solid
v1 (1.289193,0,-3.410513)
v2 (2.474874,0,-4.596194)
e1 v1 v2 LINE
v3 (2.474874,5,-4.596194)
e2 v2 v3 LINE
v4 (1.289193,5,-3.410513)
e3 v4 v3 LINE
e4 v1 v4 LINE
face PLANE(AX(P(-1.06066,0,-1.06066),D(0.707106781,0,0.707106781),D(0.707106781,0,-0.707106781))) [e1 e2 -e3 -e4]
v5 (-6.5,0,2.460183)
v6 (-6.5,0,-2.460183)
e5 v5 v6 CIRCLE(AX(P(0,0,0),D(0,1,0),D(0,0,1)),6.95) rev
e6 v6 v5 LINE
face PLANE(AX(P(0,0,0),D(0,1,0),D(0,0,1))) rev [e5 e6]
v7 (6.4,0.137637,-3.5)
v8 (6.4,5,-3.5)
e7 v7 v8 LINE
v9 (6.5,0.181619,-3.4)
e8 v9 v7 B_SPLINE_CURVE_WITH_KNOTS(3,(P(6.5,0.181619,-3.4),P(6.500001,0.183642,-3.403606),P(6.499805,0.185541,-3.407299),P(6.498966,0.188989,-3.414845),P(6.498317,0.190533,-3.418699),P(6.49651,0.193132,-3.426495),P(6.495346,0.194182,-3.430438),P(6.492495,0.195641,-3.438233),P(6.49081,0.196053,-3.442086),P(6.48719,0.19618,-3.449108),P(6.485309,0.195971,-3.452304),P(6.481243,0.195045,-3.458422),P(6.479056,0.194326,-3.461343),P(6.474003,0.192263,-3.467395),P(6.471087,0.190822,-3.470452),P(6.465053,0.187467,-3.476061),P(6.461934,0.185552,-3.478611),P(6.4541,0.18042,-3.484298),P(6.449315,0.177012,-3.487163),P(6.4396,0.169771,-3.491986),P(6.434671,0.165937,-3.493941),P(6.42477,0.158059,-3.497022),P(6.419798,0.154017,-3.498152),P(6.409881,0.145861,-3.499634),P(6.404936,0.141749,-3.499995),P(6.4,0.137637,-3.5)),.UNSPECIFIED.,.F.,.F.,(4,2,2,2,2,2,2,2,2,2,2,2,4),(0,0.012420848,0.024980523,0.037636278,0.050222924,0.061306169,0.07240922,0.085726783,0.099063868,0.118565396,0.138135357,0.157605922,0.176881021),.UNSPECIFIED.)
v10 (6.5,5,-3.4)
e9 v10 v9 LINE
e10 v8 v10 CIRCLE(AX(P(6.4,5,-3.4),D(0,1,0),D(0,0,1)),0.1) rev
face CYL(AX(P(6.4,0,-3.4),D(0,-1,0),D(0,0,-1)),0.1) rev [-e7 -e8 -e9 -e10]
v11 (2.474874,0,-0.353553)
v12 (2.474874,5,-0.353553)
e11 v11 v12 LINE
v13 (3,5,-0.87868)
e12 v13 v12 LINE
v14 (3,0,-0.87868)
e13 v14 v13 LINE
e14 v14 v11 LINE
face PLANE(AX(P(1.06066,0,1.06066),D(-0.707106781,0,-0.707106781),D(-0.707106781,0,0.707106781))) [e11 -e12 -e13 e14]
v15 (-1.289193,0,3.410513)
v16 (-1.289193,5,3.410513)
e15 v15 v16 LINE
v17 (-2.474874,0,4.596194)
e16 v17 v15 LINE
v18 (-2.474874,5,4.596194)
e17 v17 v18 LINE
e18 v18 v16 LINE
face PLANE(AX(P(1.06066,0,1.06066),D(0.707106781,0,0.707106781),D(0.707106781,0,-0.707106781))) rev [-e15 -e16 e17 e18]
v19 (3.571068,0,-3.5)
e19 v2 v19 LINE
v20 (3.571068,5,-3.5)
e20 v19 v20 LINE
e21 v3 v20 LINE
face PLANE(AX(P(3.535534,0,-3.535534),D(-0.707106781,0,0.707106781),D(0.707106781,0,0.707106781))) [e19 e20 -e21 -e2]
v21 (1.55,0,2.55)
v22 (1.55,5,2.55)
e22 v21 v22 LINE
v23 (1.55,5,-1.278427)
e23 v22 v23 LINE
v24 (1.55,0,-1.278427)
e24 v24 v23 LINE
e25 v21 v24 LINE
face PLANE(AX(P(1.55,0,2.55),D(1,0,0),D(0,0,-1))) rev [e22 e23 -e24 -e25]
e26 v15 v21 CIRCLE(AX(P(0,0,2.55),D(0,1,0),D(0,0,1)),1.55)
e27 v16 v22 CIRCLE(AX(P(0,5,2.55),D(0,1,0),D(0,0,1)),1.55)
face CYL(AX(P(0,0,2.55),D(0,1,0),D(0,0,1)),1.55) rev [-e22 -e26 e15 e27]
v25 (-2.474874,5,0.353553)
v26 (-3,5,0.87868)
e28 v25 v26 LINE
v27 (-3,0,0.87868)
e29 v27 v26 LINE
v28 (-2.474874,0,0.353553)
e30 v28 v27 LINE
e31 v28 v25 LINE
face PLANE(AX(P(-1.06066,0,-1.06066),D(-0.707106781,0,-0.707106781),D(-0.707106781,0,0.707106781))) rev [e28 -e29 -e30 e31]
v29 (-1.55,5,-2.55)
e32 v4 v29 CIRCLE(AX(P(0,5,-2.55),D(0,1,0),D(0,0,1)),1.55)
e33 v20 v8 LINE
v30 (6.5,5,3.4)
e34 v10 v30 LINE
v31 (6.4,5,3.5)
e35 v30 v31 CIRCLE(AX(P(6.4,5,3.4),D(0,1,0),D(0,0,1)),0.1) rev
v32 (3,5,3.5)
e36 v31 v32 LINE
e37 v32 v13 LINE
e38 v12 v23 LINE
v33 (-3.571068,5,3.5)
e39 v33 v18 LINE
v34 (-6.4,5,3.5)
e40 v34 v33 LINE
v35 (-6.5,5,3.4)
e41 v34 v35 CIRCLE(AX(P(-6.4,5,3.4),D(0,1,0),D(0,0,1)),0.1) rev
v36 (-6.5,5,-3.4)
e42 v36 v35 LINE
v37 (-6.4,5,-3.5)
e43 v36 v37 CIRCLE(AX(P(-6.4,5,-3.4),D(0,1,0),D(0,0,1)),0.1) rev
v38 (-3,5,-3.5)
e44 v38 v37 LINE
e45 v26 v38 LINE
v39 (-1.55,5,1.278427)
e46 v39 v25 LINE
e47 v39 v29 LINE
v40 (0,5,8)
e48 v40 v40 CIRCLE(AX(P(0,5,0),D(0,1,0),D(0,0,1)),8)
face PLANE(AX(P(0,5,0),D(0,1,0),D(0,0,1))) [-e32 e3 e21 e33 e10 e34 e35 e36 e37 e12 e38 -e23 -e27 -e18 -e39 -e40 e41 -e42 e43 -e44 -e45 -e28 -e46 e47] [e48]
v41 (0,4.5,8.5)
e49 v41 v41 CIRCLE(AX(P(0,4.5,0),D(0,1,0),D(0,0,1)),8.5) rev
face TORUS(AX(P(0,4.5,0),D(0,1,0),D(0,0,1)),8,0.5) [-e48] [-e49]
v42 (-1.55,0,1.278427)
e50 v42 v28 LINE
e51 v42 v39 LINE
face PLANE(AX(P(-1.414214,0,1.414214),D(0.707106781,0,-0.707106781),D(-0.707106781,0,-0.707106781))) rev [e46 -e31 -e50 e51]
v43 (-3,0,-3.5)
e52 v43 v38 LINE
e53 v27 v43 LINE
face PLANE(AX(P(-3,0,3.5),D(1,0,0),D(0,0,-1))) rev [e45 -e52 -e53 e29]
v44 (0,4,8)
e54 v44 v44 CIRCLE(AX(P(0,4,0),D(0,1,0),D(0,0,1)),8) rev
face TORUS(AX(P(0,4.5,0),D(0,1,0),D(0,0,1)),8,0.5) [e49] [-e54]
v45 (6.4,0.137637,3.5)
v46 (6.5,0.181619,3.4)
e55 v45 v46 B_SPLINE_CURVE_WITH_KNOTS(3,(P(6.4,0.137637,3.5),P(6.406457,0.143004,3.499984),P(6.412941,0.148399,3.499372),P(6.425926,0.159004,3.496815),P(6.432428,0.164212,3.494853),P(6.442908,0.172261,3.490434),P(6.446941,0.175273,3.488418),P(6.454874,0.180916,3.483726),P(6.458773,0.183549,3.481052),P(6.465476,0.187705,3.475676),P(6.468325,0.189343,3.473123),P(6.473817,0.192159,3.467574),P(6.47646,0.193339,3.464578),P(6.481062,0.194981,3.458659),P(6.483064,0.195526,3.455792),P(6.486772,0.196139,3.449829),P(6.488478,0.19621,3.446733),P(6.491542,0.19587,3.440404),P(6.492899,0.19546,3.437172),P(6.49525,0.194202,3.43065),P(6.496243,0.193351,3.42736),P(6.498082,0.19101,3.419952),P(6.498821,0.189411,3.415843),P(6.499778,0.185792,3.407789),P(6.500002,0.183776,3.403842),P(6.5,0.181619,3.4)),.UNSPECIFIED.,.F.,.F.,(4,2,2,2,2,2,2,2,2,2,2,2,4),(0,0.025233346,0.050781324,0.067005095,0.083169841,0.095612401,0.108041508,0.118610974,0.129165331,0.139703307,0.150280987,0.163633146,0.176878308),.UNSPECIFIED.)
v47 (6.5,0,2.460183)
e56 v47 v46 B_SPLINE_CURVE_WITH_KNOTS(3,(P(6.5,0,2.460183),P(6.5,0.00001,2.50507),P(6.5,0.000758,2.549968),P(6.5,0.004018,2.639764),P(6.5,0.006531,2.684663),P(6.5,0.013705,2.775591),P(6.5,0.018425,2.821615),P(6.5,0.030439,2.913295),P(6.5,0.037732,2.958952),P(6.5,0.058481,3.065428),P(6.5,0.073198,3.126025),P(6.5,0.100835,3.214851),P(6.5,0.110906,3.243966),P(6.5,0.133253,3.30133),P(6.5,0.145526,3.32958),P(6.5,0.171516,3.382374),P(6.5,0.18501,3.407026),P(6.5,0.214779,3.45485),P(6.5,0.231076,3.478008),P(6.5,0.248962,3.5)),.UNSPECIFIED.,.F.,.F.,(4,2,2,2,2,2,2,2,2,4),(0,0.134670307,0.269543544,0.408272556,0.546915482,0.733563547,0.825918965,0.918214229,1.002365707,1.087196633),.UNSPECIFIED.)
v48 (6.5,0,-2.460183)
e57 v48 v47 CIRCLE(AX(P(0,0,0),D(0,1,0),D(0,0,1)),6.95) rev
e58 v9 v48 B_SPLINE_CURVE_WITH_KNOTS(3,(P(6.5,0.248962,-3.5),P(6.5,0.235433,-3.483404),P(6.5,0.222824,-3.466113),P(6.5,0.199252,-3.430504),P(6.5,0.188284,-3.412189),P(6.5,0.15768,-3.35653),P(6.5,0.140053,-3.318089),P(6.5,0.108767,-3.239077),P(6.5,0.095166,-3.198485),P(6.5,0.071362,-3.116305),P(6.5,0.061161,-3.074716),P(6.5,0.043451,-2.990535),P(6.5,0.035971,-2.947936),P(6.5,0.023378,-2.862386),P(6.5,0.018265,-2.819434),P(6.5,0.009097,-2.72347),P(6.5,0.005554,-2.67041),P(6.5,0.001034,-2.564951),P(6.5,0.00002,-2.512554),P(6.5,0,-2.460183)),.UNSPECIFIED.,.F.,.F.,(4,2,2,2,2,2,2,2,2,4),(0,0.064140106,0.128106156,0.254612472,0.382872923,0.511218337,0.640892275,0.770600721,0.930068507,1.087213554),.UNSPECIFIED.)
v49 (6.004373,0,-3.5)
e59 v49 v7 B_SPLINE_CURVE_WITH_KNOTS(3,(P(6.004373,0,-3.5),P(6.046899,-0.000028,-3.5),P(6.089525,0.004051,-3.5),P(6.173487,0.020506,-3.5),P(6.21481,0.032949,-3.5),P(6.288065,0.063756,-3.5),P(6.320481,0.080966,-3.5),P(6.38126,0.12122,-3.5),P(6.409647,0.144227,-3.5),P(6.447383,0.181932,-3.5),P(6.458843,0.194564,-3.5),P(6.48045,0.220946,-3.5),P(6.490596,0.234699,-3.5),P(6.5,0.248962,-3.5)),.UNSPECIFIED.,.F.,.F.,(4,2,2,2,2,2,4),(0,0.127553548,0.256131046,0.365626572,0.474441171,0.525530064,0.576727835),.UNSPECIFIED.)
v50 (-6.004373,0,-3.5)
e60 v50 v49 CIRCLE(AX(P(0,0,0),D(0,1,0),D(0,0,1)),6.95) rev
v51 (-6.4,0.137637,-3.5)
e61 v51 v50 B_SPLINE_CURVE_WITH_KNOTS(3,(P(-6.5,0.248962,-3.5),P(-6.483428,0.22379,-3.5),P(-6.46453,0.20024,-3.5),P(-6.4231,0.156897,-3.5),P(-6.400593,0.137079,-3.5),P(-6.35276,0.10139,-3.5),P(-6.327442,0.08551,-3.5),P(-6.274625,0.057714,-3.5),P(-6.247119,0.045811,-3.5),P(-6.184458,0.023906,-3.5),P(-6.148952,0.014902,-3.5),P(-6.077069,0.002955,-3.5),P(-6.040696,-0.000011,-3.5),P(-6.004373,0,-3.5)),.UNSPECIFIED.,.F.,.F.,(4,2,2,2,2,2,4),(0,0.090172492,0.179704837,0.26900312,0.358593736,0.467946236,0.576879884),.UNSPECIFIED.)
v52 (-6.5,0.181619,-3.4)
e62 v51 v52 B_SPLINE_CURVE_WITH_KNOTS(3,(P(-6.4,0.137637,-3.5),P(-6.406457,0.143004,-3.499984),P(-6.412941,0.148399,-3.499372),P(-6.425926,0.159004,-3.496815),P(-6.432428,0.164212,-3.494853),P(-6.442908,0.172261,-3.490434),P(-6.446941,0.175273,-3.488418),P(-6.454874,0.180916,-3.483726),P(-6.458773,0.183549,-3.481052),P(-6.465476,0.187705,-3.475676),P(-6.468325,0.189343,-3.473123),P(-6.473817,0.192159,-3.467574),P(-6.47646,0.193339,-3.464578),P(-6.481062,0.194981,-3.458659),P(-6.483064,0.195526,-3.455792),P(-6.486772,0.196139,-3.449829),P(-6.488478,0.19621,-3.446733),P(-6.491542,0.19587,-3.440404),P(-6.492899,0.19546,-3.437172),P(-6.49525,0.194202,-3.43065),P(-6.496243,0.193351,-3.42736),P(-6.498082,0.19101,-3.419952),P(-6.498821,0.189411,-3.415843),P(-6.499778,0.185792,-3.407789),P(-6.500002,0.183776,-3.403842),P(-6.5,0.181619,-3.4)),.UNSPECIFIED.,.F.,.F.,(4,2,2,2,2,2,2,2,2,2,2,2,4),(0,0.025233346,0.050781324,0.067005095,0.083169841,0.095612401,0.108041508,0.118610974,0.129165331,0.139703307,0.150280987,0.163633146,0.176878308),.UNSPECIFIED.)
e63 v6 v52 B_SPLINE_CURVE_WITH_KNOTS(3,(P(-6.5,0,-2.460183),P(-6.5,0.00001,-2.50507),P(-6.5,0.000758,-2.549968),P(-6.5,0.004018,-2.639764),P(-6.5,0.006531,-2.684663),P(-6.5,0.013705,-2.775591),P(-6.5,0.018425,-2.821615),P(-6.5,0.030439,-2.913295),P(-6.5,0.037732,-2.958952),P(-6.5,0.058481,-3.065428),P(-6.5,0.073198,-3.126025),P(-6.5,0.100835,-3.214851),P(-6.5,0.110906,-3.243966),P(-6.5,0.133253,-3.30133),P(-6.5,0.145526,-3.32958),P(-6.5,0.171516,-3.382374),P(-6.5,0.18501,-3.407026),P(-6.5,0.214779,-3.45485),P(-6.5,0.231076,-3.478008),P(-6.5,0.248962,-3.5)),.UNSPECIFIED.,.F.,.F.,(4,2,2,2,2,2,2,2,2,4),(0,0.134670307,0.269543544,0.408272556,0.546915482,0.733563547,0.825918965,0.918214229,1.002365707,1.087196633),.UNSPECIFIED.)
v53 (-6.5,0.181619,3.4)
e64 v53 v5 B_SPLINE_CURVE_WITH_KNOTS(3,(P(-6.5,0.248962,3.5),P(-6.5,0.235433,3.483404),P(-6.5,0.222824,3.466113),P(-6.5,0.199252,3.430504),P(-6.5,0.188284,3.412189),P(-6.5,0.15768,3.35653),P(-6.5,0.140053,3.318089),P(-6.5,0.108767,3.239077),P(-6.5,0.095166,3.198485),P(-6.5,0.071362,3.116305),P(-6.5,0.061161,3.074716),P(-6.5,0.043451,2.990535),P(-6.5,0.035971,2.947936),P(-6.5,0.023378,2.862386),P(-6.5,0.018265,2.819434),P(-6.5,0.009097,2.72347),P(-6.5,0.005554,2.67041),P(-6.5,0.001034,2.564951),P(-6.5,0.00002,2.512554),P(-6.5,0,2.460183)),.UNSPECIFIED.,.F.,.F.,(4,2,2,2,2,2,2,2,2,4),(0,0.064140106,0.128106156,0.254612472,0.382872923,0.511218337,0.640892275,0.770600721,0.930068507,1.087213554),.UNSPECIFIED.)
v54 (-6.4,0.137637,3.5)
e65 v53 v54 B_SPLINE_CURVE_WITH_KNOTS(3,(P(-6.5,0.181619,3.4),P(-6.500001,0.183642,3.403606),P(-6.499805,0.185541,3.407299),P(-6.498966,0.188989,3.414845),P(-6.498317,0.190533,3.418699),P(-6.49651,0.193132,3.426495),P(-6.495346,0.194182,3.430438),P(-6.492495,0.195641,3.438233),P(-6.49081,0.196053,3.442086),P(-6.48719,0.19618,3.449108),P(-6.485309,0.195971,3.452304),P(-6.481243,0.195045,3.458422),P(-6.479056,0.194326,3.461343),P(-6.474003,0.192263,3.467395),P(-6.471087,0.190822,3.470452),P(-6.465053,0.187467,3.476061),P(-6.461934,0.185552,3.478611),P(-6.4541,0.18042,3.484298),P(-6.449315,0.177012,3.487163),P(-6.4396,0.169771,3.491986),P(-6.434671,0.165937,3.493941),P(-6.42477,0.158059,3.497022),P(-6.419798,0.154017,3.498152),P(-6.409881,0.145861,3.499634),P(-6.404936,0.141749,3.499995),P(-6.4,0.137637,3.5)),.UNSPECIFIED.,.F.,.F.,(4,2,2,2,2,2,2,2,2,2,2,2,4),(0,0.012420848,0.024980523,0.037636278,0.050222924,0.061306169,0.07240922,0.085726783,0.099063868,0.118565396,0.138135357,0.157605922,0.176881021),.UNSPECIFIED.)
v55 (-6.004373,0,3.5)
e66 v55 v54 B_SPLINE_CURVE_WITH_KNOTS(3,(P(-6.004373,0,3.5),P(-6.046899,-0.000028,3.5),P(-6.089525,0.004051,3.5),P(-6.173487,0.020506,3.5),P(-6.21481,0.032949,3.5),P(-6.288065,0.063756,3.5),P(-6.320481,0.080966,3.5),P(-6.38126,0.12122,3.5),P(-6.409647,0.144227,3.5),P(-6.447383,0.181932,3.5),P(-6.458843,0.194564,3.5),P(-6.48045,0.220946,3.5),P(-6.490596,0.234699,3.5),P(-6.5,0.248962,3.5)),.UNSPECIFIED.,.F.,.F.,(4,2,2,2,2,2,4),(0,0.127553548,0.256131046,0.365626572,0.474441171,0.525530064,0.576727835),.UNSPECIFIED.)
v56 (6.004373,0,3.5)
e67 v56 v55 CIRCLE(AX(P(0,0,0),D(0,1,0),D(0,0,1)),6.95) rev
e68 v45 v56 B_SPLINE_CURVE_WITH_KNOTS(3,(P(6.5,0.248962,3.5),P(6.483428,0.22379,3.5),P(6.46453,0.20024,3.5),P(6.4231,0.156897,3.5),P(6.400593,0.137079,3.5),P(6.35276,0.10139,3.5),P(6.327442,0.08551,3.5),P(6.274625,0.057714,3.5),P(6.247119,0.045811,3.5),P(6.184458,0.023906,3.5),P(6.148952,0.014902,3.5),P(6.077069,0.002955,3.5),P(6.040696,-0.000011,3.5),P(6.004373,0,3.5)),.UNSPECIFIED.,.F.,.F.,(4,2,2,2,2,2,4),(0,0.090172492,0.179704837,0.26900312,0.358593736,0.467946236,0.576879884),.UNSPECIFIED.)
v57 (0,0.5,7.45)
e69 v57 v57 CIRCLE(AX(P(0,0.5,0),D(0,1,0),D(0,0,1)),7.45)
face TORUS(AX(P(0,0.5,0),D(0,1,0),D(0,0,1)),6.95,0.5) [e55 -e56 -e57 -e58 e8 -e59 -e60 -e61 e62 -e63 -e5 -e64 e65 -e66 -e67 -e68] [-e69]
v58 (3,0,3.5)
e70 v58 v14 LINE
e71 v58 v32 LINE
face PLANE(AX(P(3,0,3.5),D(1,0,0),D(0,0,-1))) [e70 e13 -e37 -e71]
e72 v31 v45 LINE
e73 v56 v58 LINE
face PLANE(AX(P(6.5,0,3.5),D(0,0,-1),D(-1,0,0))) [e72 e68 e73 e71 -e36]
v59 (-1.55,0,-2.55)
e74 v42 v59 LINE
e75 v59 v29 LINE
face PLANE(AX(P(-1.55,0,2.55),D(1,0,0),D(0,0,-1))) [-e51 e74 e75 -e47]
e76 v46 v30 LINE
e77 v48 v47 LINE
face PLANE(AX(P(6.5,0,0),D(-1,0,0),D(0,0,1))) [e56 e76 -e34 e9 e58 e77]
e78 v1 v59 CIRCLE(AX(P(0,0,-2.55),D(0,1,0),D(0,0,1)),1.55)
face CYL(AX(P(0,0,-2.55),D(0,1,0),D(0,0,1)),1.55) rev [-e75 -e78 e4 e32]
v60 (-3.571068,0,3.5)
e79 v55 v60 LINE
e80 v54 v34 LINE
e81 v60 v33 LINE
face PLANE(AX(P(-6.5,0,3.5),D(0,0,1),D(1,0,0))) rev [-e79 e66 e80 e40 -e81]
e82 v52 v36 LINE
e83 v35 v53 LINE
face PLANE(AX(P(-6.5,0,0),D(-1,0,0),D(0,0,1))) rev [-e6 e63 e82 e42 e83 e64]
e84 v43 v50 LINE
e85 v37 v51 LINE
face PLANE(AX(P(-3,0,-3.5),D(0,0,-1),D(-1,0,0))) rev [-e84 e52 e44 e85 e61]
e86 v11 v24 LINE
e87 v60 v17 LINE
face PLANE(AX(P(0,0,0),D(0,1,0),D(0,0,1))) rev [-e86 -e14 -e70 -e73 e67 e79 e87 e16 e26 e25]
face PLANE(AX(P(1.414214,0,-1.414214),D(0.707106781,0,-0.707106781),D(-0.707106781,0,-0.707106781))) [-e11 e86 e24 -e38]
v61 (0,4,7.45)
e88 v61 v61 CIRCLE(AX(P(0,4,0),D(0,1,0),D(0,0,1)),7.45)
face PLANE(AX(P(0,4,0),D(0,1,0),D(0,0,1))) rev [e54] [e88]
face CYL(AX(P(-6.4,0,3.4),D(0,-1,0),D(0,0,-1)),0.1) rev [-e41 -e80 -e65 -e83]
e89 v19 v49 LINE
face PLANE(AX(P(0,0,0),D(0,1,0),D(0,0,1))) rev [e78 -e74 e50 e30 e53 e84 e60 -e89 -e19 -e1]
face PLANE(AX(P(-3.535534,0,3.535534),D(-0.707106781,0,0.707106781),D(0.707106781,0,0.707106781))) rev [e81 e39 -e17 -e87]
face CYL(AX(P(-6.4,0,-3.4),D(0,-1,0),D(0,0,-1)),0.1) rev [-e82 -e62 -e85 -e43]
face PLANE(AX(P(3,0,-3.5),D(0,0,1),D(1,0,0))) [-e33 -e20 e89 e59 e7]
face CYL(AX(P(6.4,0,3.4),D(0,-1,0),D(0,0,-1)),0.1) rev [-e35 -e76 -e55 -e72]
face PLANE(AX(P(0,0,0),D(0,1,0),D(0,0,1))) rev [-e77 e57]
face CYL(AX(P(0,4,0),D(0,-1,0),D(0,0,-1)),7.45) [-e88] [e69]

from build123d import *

# Parameters (mm, degrees)
SKETCH1_R           = 7.45
BOSS_EXTRUDE1_DEPTH = 4
SKETCH2_R           = 8.5
BOSS_EXTRUDE2_DEPTH = 1
SKETCH3_W           = 3.5
SKETCH3_H           = 3.5
CUT_EXTRUDE1_DEPTH  = 14.019216566
CUT_EXTRUDE2_DEPTH  = 14.019216566
CUT_EXTRUDE3_DEPTH  = 14.019216566
FILLET3_R           = 0.5
FILLET5_R           = 0.1


with BuildPart() as part:
    # Sketch1 → Boss-Extrude1 (new body)
    with BuildSketch(Plane(origin=(0, 0, 0), x_dir=(1, 0, 0), z_dir=(0, 1, 0))):
        with Locations(Location((0, 0, 0), (0, 0, 270))):
            Circle(SKETCH1_R)
    extrude(amount=BOSS_EXTRUDE1_DEPTH)

    # Sketch2 → Boss-Extrude2 (add)
    with BuildSketch(Plane(origin=(0, 4, 0), x_dir=(1, 0, 0), z_dir=(0, 1, 0))):
        with Locations(Location((0, 0, 0), (0, 0, 270))):
            Circle(SKETCH2_R)
    extrude(amount=BOSS_EXTRUDE2_DEPTH)

    # Sketch3 → Cut-Extrude1 (cut, through all)
    with BuildSketch(Plane(origin=(0, 5, 0), x_dir=(1, 0, 0), z_dir=(0, 1, 0))):
        with Locations((-4.75, 1.75)):
            Rectangle(SKETCH3_W, SKETCH3_H)
        with Locations((-4.75, -1.75)):
            Rectangle(SKETCH3_W, SKETCH3_H)
        with Locations((4.75, -1.75)):
            Rectangle(SKETCH3_W, SKETCH3_H)
        with Locations((4.75, 1.75)):
            Rectangle(SKETCH3_W, SKETCH3_H)
    extrude(amount=-CUT_EXTRUDE1_DEPTH, mode=Mode.SUBTRACT)

    # Sketch3<4> → Cut-Extrude2 (cut, through all)
    with BuildSketch(Plane(origin=(0, 5, 0), x_dir=(1, 0, 0), z_dir=(0, 1, 0))):
        with BuildLine():
            Line((-1.55, -2.55), (-1.55, 2.55))
            ThreePointArc((-1.55, 2.55), (0, 4.1), (1.55, 2.55))
            Line((1.55, 2.55), (1.55, -2.55))
            ThreePointArc((1.55, -2.55), (0, -4.1), (-1.55, -2.55))
        make_face()
    extrude(amount=-CUT_EXTRUDE2_DEPTH, mode=Mode.SUBTRACT)

    # Sketch3<5> → Cut-Extrude3 (cut, through all)
    with BuildSketch(Plane(origin=(0, 5, 0), x_dir=(1, 0, 0), z_dir=(0, 1, 0))):
        Polygon((0.353553391, 2.474873734), (2.474873734, 4.596194078), (4.596194078, 2.474873734), (2.474873734, 0.353553391), align=None)
        Polygon((-4.596194078, -2.474873734), (-2.474873734, -4.596194078), (-0.353553391, -2.474873734), (-2.474873734, -0.353553391), align=None)
    extrude(amount=-CUT_EXTRUDE3_DEPTH, mode=Mode.SUBTRACT)

    # Fillet3
    # the kernel refuses this fillet: 0.5 mm, written as the material it takes off along each edge
    with BuildSketch(Plane(origin=(0, 0, 0), x_dir=(0, 0, 1), z_dir=(-1, 0, 0))) as fillet3_piece_1:
        with BuildLine():
            CenterArc((7.45 - FILLET3_R, FILLET3_R), FILLET3_R, 270, 90)
            Line((7.45 - FILLET3_R, 0), (7.45, 0))
            Line((7.45, 0), (7.45, FILLET3_R))
        make_face()
    revolve(axis=Axis((0, 0, 0), (0, 1, 0)), mode=Mode.SUBTRACT)
    with BuildSketch(Plane(origin=(0, 4, 0), x_dir=(0, 0, 1), z_dir=(-1, 0, 0))) as fillet3_piece_2:
        with BuildLine():
            CenterArc((8.5 - FILLET3_R, FILLET3_R), FILLET3_R, 270, 90)
            Line((8.5 - FILLET3_R, 0), (8.5, 0))
            Line((8.5, 0), (8.5, FILLET3_R))
        make_face()
    revolve(axis=Axis((0, 4, 0), (0, 1, 0)), mode=Mode.SUBTRACT)
    with BuildSketch(Plane(origin=(0, 5, 0), x_dir=(0, 0, 1), z_dir=(-1, 0, 0))) as fillet3_piece_3:
        with BuildLine():
            CenterArc((8.5 - FILLET3_R, -FILLET3_R), FILLET3_R, 0, 90)
            Line((8.5 - FILLET3_R, 0), (8.5, 0))
            Line((8.5, 0), (8.5, -FILLET3_R))
        make_face()
    revolve(axis=Axis((0, 5, 0), (0, 1, 0)), mode=Mode.SUBTRACT)

    # Fillet5
    fillet5_edges = [part.edges().sort_by_distance(p)[0] for p in [
        (-6.5, 2.62448081, 3.5),
        (-6.5, 2.62448081, -3.5),
        (6.5, 2.62448081, 3.5),
        (6.5, 2.62448081, -3.5),
    ]]
    fillet(fillet5_edges, radius=FILLET5_R)


solid = part.part
